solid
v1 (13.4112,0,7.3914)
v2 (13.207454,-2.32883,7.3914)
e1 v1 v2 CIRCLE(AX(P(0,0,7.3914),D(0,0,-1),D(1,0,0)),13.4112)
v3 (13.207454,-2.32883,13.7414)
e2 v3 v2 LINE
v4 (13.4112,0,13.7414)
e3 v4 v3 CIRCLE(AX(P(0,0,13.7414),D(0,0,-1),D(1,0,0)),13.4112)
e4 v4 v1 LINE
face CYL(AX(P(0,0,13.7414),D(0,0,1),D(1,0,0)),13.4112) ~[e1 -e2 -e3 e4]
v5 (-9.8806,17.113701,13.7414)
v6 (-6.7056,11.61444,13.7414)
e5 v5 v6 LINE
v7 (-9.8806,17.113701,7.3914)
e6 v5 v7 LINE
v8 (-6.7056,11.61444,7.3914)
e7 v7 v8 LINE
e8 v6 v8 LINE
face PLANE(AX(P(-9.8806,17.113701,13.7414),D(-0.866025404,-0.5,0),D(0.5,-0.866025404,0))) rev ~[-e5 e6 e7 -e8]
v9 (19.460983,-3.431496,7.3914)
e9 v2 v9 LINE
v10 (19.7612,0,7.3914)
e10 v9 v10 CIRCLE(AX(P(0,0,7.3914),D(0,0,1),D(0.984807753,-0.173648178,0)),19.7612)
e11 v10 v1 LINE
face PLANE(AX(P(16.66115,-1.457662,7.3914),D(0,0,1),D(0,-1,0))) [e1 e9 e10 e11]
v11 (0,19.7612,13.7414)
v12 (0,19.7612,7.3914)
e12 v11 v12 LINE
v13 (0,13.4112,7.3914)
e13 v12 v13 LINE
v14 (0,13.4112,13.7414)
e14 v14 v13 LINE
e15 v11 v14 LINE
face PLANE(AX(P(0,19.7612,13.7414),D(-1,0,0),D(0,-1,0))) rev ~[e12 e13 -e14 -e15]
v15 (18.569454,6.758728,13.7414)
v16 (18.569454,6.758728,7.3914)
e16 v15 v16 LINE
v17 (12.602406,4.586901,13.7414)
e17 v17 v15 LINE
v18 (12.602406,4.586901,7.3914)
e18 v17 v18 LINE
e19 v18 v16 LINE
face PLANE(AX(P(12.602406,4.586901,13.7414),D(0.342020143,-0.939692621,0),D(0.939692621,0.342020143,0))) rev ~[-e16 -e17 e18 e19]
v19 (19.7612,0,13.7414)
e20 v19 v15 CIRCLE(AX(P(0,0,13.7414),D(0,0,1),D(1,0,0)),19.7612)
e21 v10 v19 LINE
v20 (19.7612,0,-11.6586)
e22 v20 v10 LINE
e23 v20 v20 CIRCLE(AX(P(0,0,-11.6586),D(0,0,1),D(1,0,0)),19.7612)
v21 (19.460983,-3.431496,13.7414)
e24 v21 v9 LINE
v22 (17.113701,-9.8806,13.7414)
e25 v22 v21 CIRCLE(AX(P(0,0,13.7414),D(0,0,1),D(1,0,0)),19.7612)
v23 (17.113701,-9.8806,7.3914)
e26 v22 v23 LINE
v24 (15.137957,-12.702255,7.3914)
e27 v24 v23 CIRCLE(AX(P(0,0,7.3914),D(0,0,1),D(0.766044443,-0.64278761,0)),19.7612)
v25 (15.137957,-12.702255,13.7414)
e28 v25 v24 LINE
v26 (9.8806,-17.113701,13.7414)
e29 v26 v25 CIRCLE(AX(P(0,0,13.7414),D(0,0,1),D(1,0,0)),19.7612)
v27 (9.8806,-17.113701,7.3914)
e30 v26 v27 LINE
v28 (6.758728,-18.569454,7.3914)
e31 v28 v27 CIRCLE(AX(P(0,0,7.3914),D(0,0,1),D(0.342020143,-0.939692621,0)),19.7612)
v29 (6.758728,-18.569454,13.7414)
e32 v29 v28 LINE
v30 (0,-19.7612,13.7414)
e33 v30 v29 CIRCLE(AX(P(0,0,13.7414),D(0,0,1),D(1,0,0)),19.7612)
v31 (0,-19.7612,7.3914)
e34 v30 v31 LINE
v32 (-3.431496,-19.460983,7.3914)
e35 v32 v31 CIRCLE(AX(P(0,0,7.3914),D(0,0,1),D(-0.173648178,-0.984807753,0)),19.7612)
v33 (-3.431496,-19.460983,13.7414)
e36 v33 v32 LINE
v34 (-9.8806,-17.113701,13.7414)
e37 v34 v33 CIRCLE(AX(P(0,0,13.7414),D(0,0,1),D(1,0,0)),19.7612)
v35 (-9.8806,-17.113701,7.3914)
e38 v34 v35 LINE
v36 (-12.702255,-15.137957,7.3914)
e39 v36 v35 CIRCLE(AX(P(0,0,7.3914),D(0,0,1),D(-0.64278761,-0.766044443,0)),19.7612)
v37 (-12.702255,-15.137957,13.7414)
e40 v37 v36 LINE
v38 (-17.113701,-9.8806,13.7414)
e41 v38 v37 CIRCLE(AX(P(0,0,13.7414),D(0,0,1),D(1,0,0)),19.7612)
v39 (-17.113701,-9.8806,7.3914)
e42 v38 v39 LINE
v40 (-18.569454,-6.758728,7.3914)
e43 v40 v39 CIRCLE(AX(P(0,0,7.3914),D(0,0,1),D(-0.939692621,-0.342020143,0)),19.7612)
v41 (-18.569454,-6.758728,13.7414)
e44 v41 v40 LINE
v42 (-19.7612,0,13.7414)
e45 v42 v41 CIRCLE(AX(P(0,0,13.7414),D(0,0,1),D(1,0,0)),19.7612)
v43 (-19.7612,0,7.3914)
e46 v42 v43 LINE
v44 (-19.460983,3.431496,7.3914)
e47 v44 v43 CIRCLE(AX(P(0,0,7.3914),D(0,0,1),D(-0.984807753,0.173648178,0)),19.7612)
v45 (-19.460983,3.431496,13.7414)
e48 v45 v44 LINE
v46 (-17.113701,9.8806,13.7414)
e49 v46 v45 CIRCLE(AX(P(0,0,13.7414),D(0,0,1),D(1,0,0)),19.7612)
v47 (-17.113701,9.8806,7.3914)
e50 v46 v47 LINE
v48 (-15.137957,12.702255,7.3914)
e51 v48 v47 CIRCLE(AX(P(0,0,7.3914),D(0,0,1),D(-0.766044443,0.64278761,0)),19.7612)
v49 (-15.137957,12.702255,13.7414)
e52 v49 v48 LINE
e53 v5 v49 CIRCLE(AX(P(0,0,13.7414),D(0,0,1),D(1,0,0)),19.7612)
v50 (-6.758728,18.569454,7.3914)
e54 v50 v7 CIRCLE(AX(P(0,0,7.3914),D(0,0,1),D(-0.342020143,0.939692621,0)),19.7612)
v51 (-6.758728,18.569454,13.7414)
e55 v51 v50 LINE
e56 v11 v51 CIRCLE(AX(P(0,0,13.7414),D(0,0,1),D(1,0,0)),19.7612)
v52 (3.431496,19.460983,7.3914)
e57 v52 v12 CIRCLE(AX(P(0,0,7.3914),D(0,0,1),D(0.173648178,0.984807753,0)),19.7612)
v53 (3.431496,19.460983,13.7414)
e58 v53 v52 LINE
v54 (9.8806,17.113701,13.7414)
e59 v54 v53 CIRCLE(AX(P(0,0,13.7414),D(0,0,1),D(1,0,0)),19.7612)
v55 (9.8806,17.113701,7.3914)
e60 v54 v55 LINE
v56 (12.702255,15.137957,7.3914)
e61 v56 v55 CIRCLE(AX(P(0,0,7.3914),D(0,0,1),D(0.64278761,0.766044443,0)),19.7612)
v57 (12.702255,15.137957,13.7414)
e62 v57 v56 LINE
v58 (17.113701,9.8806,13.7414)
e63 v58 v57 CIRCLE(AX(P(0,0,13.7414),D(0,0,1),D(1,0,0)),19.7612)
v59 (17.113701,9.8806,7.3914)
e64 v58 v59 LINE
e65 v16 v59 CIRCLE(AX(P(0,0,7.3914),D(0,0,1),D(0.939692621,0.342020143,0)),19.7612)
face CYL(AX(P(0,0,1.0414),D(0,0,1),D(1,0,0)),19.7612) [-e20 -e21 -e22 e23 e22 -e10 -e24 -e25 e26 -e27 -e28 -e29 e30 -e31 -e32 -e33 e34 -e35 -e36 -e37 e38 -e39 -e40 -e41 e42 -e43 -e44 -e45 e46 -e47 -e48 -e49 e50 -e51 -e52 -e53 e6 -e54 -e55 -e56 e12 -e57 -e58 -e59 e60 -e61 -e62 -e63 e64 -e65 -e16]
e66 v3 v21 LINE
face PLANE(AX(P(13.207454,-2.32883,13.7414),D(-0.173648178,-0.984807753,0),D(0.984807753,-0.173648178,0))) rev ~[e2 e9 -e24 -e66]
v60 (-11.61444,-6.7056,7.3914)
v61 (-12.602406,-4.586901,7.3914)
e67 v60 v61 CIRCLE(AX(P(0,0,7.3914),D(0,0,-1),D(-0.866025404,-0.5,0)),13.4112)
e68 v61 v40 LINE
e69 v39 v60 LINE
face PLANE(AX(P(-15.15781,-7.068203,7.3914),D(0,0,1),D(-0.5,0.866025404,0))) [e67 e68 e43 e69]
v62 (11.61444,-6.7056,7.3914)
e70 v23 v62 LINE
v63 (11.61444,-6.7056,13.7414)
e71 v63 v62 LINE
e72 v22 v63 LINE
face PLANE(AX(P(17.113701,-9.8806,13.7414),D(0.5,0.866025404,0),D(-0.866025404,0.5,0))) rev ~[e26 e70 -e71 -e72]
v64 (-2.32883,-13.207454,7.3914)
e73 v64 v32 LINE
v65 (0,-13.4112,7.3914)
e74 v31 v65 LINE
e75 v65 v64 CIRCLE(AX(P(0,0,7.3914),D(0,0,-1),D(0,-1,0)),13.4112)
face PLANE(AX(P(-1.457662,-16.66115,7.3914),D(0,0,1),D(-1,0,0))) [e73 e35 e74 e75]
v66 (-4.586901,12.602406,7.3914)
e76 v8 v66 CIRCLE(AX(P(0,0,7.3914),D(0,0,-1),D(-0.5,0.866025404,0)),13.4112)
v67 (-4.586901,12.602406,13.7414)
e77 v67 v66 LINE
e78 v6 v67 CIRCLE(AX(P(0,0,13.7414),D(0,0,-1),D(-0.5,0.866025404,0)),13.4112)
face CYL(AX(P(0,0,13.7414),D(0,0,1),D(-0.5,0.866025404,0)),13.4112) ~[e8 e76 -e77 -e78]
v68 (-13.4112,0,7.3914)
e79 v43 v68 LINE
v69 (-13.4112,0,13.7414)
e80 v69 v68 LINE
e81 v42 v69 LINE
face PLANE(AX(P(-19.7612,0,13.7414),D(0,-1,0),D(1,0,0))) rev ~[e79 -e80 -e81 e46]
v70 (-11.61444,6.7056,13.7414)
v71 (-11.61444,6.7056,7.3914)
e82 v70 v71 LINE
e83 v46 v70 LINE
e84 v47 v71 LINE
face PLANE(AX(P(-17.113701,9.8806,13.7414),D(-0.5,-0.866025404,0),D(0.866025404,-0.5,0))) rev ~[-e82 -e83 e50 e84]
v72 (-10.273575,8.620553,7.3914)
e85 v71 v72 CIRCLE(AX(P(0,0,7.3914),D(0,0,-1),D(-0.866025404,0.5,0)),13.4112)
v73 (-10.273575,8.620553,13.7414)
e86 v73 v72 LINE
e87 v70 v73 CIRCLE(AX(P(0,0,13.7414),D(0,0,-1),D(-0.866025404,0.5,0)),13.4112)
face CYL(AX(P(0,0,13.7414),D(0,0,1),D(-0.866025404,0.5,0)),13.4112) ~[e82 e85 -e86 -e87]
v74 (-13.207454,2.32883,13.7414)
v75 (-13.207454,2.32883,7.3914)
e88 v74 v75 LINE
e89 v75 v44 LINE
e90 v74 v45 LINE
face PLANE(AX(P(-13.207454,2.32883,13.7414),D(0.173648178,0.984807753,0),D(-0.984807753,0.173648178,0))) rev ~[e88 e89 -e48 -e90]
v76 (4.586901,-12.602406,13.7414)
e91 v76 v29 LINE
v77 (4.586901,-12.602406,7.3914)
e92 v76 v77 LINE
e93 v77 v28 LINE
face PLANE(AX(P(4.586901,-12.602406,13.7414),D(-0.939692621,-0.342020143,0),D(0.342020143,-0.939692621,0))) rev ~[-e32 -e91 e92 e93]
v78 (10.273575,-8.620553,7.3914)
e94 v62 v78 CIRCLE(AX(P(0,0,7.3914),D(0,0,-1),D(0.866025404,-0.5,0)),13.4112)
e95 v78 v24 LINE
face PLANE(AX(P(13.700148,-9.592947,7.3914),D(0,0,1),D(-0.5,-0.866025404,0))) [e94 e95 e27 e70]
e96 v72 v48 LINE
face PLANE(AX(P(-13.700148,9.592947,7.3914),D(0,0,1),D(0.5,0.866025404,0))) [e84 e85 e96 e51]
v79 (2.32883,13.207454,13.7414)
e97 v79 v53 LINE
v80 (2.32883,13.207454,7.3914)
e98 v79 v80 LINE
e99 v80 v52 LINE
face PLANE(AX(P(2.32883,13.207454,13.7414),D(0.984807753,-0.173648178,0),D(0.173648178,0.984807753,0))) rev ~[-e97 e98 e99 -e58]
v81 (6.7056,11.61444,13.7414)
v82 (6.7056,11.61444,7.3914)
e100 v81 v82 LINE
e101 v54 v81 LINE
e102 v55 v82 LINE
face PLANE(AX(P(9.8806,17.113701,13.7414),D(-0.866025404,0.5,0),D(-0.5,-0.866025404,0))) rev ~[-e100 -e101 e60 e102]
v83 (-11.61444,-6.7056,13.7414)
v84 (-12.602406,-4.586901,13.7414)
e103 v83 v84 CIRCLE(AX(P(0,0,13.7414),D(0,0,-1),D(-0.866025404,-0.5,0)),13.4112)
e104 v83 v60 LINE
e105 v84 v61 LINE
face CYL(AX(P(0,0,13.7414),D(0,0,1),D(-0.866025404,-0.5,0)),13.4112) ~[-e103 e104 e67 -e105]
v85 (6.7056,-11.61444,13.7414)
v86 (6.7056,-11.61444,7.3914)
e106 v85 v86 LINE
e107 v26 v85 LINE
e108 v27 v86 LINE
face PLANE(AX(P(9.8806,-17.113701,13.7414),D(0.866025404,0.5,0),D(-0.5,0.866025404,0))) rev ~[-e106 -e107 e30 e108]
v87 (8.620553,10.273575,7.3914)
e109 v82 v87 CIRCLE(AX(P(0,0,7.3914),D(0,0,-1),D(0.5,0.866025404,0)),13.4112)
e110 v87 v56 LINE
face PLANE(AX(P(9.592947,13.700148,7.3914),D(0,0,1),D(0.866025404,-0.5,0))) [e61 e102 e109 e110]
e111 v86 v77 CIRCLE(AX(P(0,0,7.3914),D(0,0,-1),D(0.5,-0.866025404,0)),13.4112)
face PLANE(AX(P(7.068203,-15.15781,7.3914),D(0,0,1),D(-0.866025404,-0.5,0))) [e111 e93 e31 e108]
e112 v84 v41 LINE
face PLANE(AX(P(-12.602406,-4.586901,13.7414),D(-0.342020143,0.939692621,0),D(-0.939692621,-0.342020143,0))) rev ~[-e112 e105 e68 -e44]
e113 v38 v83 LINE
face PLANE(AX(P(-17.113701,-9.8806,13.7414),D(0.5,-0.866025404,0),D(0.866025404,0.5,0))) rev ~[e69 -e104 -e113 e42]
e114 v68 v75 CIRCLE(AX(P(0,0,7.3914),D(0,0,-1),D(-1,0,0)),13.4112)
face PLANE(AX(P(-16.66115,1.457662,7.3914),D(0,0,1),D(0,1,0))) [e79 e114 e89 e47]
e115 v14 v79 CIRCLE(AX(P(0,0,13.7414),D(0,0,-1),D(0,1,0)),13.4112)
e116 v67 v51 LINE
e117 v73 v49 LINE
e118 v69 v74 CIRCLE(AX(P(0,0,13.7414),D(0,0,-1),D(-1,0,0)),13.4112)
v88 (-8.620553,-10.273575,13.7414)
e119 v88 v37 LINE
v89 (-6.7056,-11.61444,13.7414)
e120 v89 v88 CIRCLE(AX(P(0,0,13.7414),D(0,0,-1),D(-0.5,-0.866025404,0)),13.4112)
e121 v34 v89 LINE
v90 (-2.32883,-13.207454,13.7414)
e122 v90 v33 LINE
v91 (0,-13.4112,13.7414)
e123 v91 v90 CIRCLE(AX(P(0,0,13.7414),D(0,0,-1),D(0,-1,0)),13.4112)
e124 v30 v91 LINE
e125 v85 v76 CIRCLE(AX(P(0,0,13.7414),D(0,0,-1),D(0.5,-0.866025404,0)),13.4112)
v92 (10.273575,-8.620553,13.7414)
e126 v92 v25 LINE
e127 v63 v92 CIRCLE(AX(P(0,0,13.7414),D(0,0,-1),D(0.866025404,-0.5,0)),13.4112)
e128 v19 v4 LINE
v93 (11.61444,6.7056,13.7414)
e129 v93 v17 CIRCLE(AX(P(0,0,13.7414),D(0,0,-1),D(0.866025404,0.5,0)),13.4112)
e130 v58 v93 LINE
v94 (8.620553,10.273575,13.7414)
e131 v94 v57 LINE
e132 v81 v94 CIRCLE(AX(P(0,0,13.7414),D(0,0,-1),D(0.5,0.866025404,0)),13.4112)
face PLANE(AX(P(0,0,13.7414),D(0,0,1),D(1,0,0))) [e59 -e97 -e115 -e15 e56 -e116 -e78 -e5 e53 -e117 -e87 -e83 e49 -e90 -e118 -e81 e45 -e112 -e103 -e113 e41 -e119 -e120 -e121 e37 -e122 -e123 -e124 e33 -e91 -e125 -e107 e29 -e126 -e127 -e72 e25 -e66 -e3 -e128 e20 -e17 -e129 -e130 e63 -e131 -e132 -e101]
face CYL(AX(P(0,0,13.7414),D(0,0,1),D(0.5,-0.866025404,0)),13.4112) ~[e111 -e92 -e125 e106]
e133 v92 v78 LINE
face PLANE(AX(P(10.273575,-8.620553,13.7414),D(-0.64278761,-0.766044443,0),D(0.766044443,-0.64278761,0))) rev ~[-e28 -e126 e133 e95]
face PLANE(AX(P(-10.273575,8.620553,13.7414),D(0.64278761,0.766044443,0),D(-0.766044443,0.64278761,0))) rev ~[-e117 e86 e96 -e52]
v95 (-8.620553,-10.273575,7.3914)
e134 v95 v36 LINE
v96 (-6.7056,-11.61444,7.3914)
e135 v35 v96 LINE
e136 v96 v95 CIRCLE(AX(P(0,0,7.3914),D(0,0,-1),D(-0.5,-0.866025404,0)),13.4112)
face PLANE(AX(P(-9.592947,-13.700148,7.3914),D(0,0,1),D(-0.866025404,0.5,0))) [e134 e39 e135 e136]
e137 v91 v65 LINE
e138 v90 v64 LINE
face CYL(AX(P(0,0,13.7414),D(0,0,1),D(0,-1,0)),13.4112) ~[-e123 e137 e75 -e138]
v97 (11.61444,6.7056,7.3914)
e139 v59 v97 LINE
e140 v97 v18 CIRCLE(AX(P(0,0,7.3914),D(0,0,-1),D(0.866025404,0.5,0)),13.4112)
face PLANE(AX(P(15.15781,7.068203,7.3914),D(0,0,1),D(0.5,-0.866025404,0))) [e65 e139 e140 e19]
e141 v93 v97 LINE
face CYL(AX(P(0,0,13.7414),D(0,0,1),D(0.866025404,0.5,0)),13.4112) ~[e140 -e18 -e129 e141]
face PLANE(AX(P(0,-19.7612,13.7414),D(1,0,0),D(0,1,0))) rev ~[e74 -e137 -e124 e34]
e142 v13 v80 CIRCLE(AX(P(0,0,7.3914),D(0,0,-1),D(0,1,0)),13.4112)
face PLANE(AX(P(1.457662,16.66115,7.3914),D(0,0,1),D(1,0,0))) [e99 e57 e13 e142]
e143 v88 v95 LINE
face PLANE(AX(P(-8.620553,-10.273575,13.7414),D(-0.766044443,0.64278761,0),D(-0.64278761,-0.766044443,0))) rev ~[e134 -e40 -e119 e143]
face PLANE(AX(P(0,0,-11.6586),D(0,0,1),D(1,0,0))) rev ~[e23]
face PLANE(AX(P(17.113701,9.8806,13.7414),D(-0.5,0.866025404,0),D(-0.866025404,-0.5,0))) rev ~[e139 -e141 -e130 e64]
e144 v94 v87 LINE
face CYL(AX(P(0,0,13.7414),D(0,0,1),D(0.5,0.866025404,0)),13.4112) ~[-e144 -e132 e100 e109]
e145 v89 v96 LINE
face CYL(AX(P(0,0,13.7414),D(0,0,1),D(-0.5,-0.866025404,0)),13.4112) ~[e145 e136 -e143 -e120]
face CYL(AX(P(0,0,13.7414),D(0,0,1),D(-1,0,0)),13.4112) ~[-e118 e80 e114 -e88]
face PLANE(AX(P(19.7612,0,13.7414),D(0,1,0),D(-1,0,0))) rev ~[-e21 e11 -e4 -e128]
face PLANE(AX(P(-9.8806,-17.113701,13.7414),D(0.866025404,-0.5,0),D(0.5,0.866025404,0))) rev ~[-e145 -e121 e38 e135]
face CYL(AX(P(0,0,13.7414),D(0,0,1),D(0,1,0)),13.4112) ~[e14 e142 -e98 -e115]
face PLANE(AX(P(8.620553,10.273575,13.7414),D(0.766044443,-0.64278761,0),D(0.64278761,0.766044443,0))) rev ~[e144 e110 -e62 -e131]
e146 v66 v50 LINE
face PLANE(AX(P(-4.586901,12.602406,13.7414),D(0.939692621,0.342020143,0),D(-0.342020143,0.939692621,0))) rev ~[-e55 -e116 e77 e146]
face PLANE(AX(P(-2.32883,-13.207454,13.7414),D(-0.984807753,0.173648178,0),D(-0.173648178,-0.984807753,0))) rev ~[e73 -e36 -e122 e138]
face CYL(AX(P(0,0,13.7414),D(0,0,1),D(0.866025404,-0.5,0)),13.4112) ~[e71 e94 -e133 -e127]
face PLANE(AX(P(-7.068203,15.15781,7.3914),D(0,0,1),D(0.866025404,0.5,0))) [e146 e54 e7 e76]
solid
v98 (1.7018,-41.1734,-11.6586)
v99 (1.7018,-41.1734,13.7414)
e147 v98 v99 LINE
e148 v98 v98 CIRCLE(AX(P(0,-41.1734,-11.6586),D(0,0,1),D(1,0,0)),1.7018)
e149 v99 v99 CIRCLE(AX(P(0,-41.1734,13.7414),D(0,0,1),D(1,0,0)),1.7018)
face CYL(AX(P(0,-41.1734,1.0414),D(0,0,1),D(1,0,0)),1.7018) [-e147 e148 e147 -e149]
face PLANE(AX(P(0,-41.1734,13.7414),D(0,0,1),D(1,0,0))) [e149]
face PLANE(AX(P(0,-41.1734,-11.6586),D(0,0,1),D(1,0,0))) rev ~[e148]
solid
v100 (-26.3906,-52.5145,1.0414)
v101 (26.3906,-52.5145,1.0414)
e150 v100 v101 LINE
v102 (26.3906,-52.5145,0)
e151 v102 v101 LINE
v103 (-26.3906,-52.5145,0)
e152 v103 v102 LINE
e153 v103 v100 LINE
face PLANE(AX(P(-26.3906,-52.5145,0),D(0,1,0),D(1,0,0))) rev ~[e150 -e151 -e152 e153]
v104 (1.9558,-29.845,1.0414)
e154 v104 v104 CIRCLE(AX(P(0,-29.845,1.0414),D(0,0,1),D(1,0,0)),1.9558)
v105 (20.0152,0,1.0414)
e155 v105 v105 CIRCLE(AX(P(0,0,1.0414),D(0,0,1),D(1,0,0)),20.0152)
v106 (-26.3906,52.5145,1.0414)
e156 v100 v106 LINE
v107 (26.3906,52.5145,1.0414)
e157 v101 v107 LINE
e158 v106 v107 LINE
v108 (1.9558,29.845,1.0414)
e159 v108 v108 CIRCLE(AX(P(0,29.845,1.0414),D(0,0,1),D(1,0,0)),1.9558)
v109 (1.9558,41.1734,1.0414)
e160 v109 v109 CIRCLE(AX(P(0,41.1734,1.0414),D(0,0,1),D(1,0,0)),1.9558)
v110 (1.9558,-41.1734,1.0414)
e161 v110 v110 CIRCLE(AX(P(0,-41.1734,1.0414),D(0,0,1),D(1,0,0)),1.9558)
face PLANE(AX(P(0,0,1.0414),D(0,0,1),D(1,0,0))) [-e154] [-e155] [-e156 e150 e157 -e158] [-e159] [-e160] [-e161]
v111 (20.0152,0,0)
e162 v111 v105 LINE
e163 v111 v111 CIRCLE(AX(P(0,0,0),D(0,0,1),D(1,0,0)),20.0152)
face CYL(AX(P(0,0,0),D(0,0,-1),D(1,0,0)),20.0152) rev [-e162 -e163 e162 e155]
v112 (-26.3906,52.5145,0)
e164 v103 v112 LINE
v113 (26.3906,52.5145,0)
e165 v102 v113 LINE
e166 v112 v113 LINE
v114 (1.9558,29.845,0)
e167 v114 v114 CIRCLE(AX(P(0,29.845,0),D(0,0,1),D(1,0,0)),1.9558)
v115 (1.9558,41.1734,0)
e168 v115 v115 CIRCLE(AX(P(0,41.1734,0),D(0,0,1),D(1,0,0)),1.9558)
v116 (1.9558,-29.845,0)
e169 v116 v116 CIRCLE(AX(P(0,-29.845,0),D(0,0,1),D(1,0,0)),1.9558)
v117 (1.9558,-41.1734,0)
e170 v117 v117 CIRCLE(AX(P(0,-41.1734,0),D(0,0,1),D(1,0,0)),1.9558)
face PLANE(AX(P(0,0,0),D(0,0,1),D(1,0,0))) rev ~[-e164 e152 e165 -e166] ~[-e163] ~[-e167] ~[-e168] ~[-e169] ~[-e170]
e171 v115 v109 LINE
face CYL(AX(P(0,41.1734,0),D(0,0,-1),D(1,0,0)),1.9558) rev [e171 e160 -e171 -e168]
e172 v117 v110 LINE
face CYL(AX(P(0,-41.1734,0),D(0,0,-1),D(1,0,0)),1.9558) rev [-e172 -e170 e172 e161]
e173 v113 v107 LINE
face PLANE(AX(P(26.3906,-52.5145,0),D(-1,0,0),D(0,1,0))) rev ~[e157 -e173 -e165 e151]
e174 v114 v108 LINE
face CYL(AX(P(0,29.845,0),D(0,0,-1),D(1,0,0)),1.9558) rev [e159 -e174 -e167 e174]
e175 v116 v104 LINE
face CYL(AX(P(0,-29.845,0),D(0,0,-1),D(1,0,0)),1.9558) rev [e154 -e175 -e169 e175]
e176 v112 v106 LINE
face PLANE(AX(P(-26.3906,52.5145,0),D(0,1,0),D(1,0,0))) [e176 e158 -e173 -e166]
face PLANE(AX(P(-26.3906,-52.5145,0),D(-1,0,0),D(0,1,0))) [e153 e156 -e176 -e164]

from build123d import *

# Parameters (mm, degrees)
F0_W            = 52.7812
F0_H            = 105.029
F0_R            = 1.9558
F0_R_2          = 20.0152
F1_DEPTH        = 1.0414
F2_R            = 19.7612
F3_DEPTH        = 12.7
F4_R            = 1.7018
F5_DEPTH        = 12.7
F7_DEPTH        = 6.35
F7_COPIES_COUNT = 12


# Not quite as in the source:
# - a pattern or mirror of a feature is missing from the dataset's text; its kind, count and spacing are read off the source's solid


with BuildPart() as f1:
    # F0 (on Top) → F1 (new body)
    with BuildSketch(Plane.XY):
        Rectangle(F0_W, F0_H)
        with Locations((0, -41.1734)):
            Circle(F0_R, mode=Mode.SUBTRACT)
        with Locations((0, -29.845)):
            Circle(F0_R, mode=Mode.SUBTRACT)
        Circle(F0_R_2, mode=Mode.SUBTRACT)
        with Locations((0, 29.845)):
            Circle(F0_R, mode=Mode.SUBTRACT)
        with Locations((0, 41.1734)):
            Circle(F0_R, mode=Mode.SUBTRACT)
    extrude(amount=F1_DEPTH)


with BuildPart() as f3:
    # F2 (on face) → F3 (new body, symmetric)
    with BuildSketch(Plane.XY.offset(1.0414)):
        Circle(F2_R)
    extrude(amount=F3_DEPTH, both=True)

    # F6 (on face) → F7 (cut)
    with BuildSketch(Plane.XY.offset(13.7414)):
        with BuildLine():
            ThreePointArc((0, 13.4112), (1.1688630971, 13.360166335), (2.3288304403, 13.2074537372))
            Line((2.3288304403, 13.2074537372), (3.4314963685, 19.4609829688))
            ThreePointArc((3.4314963685, 19.4609829688), (1.7223020636, 19.6860026679), (0, 19.7612))
            Line((0, 19.7612), (0, 13.4112))
        make_face()
    f7 = extrude(amount=-F7_DEPTH, mode=Mode.SUBTRACT)

    # F7_copies: F7 ×12 about axis
    f7_copies_axis = Axis((0, 0, 0), (0, 0, 1))
    for i in range(1, F7_COPIES_COUNT):
        add(f7.rotate(f7_copies_axis, i * 360 / F7_COPIES_COUNT), mode=Mode.SUBTRACT)


with BuildPart() as f5:
    # F4 (on face) → F5 (new body, symmetric)
    with BuildSketch(Plane.XY.offset(1.0414)):
        with Locations((0, -41.1734)):
            Circle(F4_R)
    extrude(amount=F5_DEPTH, both=True)


solid = Compound([f1.part, f3.part, f5.part])
